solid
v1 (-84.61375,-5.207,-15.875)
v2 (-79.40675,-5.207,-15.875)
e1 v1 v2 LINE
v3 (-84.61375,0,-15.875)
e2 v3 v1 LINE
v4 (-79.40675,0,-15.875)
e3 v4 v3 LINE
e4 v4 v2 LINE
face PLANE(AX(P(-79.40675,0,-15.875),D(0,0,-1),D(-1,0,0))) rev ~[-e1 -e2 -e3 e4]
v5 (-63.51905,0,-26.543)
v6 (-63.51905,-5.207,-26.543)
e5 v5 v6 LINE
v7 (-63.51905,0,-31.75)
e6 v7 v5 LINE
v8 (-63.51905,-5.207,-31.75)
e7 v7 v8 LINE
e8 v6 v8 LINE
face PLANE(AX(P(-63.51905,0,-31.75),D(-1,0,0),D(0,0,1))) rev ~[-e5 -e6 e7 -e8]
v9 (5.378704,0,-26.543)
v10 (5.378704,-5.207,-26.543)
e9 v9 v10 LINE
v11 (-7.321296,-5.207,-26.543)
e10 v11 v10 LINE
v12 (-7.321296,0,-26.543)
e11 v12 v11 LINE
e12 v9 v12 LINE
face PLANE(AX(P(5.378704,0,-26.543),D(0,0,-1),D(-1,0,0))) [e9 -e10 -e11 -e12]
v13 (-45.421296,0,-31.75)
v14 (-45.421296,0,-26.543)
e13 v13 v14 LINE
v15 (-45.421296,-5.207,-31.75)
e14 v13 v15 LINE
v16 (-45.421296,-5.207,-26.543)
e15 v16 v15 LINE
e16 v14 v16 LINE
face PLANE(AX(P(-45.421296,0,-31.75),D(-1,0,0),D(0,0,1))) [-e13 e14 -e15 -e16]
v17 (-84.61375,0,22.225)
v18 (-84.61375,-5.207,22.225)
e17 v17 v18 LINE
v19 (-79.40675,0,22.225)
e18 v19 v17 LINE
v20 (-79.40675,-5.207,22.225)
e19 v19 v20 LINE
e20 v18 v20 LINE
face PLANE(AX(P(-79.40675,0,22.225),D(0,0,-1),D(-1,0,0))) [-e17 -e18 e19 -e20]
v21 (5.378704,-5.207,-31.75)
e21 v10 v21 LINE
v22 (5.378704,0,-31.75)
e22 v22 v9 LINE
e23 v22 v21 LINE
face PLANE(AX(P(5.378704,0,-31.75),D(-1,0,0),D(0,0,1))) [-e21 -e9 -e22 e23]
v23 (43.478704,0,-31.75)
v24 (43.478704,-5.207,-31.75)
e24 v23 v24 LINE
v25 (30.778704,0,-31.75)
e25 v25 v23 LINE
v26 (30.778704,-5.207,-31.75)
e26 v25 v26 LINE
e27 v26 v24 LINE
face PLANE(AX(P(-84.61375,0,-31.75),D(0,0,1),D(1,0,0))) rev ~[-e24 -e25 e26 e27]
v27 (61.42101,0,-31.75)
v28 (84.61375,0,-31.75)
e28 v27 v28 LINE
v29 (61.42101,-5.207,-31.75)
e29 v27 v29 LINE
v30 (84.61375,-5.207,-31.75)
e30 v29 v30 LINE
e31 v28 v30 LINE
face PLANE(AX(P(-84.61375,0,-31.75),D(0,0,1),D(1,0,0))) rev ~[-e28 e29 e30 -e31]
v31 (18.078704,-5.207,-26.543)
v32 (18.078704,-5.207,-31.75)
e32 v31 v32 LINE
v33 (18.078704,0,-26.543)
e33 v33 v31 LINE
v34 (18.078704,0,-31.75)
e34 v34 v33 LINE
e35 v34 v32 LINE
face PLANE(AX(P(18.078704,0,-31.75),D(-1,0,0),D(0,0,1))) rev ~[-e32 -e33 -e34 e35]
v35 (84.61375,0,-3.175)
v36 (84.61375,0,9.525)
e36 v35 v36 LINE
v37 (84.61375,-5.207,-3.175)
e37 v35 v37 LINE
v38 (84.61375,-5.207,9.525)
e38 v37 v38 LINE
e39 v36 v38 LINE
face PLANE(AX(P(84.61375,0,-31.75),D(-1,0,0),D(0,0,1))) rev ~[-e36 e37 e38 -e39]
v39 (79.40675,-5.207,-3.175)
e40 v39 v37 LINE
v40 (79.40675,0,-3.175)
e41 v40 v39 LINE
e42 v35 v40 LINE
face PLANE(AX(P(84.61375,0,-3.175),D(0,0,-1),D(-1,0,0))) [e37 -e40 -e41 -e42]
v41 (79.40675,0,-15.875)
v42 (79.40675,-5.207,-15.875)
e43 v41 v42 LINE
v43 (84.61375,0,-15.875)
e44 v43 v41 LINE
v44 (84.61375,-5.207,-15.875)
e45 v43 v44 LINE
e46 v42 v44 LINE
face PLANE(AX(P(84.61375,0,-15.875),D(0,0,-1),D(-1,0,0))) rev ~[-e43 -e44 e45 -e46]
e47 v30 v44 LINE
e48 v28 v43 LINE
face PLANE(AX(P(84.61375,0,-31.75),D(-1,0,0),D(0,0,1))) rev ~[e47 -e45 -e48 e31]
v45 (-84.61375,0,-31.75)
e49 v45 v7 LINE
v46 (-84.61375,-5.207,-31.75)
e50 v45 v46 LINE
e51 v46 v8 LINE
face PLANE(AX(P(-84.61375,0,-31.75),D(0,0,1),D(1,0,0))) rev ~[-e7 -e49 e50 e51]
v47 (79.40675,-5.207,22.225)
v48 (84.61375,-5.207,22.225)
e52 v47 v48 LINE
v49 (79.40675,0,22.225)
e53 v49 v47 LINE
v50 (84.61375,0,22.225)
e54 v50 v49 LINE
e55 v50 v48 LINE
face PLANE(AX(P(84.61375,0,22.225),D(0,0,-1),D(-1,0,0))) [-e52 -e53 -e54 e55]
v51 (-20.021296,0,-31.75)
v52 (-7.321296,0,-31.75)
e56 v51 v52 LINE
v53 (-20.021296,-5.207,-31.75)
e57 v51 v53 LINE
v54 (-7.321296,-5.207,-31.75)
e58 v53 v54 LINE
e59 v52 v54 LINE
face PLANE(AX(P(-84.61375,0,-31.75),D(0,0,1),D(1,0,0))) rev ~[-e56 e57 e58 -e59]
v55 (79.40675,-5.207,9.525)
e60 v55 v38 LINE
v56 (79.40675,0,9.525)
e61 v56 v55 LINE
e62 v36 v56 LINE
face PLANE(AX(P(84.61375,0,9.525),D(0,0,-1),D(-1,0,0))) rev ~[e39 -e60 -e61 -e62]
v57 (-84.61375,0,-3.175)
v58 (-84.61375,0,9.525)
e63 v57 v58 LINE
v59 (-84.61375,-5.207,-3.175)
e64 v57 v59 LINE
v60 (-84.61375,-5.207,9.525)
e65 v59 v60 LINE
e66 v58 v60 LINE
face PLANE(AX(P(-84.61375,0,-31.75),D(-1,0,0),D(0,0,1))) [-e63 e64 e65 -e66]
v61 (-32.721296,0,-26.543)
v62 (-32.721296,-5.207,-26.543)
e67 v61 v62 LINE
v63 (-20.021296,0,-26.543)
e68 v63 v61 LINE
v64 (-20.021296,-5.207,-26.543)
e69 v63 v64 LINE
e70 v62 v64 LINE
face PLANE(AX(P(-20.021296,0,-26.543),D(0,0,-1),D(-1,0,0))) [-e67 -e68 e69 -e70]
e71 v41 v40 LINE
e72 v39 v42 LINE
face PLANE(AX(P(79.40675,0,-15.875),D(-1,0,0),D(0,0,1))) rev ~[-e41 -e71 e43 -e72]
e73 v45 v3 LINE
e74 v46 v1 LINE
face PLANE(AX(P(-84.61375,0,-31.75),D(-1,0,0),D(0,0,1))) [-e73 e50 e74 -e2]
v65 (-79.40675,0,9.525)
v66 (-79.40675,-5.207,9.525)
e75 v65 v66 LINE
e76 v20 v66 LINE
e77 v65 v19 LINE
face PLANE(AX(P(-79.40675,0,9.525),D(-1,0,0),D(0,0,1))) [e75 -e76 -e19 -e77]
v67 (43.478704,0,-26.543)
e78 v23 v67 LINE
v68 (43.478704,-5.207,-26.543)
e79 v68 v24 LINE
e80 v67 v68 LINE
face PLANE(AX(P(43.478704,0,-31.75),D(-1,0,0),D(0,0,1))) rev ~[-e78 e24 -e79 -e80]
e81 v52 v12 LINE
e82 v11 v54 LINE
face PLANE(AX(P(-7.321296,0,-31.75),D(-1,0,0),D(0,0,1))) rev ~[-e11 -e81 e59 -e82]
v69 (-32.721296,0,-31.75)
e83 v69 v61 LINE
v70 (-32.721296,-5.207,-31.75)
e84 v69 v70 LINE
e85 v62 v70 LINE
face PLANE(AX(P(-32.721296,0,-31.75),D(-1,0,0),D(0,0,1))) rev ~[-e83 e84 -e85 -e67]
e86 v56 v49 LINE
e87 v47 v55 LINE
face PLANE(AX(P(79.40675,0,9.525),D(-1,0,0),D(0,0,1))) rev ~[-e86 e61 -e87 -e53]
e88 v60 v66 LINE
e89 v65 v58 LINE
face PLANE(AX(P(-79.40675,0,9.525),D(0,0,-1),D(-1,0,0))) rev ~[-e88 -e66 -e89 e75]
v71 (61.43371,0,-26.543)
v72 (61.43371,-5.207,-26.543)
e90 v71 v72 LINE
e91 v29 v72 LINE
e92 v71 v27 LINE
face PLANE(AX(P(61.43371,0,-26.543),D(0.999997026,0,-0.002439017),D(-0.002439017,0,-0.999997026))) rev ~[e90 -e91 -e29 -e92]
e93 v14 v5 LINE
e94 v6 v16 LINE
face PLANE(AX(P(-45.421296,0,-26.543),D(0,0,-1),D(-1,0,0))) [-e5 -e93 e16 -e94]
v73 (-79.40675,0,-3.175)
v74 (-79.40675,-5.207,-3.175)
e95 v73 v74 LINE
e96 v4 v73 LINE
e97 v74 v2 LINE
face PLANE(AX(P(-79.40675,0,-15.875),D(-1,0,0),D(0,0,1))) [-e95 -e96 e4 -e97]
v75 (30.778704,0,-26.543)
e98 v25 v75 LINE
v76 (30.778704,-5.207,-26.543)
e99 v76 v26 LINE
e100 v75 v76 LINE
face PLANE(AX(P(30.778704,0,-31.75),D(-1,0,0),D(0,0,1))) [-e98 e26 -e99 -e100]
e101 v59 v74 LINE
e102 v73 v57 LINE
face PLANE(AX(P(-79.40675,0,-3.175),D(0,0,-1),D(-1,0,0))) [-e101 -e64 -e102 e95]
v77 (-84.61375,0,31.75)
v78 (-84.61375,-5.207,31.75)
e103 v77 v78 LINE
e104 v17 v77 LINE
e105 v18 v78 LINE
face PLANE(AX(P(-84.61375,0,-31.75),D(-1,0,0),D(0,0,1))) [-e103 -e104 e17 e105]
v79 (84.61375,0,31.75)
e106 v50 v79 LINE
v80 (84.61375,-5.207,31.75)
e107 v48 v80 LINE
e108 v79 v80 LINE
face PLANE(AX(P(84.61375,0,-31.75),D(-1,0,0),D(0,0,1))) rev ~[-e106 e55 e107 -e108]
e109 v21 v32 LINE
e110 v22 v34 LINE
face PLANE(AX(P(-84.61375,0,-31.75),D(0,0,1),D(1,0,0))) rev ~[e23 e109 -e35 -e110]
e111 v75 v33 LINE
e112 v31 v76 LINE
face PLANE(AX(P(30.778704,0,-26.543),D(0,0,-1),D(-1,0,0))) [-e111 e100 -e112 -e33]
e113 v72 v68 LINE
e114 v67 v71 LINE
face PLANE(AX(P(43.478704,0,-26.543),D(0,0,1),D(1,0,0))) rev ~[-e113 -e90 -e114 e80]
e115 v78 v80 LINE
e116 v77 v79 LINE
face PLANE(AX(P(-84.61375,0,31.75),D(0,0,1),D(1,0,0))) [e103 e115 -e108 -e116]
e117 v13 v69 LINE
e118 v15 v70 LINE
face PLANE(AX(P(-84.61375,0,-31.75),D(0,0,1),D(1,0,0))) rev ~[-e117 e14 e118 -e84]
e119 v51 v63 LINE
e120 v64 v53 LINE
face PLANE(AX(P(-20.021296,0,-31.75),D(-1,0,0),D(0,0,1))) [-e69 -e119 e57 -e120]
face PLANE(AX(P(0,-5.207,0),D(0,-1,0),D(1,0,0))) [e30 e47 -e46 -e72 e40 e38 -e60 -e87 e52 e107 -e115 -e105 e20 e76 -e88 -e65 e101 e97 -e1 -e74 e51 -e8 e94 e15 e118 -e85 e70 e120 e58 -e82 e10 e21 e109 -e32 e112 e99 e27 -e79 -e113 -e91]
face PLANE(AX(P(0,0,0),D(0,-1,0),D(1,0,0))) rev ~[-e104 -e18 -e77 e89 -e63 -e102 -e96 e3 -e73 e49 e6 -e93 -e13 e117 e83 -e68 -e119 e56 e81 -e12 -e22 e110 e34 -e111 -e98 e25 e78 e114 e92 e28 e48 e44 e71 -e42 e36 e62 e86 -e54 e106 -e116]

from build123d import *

# Parameters (mm, degrees)
F0_W     = 169.2275
F0_H     = 63.5
F1_DEPTH = 5.207
F2_W     = 5.207
F2_H     = 12.7
F2_W_2   = 12.7
F2_H_2   = 5.207
F2_W_3   = 18.097754
F3_DEPTH = 5.208


# Not quite as in the source:
# - a feature names something its author has since deleted; it is built from what else it names


with BuildPart() as f1:
    # F0 (on Front) → F1 (new body)
    with BuildSketch(Plane.XZ):
        Rectangle(F0_W, F0_H)
    extrude(amount=F1_DEPTH)

    # F2 (on face) → F3 (cut, through all)
    with BuildSketch(Plane(origin=(0, 0, 0), x_dir=(-1, 0, 0), z_dir=(0, 1, 0))):
        with Locations((-82.01025, 15.875)):
            Rectangle(F2_W, F2_H)
        with Locations((-82.01025, -9.525)):
            Rectangle(F2_W, F2_H)
        Polygon((-61.42101, -31.75), (-43.478704, -31.75), (-43.478704, -26.543), (-61.43371, -26.543), align=None)
        with Locations((-24.428704, -29.1465)):
            Rectangle(F2_W_2, F2_H_2)
        with Locations((0.971296, -29.1465)):
            Rectangle(F2_W_2, F2_H_2)
        with Locations((26.371296, -29.1465)):
            Rectangle(F2_W_2, F2_H_2)
        with Locations((54.470173, -29.1465)):
            Rectangle(F2_W_3, F2_H_2)
        with Locations((82.01025, 15.875)):
            Rectangle(F2_W, F2_H)
        with Locations((82.01025, -9.525)):
            Rectangle(F2_W, F2_H)
    extrude(amount=-F3_DEPTH, mode=Mode.SUBTRACT)


solid = f1.part
